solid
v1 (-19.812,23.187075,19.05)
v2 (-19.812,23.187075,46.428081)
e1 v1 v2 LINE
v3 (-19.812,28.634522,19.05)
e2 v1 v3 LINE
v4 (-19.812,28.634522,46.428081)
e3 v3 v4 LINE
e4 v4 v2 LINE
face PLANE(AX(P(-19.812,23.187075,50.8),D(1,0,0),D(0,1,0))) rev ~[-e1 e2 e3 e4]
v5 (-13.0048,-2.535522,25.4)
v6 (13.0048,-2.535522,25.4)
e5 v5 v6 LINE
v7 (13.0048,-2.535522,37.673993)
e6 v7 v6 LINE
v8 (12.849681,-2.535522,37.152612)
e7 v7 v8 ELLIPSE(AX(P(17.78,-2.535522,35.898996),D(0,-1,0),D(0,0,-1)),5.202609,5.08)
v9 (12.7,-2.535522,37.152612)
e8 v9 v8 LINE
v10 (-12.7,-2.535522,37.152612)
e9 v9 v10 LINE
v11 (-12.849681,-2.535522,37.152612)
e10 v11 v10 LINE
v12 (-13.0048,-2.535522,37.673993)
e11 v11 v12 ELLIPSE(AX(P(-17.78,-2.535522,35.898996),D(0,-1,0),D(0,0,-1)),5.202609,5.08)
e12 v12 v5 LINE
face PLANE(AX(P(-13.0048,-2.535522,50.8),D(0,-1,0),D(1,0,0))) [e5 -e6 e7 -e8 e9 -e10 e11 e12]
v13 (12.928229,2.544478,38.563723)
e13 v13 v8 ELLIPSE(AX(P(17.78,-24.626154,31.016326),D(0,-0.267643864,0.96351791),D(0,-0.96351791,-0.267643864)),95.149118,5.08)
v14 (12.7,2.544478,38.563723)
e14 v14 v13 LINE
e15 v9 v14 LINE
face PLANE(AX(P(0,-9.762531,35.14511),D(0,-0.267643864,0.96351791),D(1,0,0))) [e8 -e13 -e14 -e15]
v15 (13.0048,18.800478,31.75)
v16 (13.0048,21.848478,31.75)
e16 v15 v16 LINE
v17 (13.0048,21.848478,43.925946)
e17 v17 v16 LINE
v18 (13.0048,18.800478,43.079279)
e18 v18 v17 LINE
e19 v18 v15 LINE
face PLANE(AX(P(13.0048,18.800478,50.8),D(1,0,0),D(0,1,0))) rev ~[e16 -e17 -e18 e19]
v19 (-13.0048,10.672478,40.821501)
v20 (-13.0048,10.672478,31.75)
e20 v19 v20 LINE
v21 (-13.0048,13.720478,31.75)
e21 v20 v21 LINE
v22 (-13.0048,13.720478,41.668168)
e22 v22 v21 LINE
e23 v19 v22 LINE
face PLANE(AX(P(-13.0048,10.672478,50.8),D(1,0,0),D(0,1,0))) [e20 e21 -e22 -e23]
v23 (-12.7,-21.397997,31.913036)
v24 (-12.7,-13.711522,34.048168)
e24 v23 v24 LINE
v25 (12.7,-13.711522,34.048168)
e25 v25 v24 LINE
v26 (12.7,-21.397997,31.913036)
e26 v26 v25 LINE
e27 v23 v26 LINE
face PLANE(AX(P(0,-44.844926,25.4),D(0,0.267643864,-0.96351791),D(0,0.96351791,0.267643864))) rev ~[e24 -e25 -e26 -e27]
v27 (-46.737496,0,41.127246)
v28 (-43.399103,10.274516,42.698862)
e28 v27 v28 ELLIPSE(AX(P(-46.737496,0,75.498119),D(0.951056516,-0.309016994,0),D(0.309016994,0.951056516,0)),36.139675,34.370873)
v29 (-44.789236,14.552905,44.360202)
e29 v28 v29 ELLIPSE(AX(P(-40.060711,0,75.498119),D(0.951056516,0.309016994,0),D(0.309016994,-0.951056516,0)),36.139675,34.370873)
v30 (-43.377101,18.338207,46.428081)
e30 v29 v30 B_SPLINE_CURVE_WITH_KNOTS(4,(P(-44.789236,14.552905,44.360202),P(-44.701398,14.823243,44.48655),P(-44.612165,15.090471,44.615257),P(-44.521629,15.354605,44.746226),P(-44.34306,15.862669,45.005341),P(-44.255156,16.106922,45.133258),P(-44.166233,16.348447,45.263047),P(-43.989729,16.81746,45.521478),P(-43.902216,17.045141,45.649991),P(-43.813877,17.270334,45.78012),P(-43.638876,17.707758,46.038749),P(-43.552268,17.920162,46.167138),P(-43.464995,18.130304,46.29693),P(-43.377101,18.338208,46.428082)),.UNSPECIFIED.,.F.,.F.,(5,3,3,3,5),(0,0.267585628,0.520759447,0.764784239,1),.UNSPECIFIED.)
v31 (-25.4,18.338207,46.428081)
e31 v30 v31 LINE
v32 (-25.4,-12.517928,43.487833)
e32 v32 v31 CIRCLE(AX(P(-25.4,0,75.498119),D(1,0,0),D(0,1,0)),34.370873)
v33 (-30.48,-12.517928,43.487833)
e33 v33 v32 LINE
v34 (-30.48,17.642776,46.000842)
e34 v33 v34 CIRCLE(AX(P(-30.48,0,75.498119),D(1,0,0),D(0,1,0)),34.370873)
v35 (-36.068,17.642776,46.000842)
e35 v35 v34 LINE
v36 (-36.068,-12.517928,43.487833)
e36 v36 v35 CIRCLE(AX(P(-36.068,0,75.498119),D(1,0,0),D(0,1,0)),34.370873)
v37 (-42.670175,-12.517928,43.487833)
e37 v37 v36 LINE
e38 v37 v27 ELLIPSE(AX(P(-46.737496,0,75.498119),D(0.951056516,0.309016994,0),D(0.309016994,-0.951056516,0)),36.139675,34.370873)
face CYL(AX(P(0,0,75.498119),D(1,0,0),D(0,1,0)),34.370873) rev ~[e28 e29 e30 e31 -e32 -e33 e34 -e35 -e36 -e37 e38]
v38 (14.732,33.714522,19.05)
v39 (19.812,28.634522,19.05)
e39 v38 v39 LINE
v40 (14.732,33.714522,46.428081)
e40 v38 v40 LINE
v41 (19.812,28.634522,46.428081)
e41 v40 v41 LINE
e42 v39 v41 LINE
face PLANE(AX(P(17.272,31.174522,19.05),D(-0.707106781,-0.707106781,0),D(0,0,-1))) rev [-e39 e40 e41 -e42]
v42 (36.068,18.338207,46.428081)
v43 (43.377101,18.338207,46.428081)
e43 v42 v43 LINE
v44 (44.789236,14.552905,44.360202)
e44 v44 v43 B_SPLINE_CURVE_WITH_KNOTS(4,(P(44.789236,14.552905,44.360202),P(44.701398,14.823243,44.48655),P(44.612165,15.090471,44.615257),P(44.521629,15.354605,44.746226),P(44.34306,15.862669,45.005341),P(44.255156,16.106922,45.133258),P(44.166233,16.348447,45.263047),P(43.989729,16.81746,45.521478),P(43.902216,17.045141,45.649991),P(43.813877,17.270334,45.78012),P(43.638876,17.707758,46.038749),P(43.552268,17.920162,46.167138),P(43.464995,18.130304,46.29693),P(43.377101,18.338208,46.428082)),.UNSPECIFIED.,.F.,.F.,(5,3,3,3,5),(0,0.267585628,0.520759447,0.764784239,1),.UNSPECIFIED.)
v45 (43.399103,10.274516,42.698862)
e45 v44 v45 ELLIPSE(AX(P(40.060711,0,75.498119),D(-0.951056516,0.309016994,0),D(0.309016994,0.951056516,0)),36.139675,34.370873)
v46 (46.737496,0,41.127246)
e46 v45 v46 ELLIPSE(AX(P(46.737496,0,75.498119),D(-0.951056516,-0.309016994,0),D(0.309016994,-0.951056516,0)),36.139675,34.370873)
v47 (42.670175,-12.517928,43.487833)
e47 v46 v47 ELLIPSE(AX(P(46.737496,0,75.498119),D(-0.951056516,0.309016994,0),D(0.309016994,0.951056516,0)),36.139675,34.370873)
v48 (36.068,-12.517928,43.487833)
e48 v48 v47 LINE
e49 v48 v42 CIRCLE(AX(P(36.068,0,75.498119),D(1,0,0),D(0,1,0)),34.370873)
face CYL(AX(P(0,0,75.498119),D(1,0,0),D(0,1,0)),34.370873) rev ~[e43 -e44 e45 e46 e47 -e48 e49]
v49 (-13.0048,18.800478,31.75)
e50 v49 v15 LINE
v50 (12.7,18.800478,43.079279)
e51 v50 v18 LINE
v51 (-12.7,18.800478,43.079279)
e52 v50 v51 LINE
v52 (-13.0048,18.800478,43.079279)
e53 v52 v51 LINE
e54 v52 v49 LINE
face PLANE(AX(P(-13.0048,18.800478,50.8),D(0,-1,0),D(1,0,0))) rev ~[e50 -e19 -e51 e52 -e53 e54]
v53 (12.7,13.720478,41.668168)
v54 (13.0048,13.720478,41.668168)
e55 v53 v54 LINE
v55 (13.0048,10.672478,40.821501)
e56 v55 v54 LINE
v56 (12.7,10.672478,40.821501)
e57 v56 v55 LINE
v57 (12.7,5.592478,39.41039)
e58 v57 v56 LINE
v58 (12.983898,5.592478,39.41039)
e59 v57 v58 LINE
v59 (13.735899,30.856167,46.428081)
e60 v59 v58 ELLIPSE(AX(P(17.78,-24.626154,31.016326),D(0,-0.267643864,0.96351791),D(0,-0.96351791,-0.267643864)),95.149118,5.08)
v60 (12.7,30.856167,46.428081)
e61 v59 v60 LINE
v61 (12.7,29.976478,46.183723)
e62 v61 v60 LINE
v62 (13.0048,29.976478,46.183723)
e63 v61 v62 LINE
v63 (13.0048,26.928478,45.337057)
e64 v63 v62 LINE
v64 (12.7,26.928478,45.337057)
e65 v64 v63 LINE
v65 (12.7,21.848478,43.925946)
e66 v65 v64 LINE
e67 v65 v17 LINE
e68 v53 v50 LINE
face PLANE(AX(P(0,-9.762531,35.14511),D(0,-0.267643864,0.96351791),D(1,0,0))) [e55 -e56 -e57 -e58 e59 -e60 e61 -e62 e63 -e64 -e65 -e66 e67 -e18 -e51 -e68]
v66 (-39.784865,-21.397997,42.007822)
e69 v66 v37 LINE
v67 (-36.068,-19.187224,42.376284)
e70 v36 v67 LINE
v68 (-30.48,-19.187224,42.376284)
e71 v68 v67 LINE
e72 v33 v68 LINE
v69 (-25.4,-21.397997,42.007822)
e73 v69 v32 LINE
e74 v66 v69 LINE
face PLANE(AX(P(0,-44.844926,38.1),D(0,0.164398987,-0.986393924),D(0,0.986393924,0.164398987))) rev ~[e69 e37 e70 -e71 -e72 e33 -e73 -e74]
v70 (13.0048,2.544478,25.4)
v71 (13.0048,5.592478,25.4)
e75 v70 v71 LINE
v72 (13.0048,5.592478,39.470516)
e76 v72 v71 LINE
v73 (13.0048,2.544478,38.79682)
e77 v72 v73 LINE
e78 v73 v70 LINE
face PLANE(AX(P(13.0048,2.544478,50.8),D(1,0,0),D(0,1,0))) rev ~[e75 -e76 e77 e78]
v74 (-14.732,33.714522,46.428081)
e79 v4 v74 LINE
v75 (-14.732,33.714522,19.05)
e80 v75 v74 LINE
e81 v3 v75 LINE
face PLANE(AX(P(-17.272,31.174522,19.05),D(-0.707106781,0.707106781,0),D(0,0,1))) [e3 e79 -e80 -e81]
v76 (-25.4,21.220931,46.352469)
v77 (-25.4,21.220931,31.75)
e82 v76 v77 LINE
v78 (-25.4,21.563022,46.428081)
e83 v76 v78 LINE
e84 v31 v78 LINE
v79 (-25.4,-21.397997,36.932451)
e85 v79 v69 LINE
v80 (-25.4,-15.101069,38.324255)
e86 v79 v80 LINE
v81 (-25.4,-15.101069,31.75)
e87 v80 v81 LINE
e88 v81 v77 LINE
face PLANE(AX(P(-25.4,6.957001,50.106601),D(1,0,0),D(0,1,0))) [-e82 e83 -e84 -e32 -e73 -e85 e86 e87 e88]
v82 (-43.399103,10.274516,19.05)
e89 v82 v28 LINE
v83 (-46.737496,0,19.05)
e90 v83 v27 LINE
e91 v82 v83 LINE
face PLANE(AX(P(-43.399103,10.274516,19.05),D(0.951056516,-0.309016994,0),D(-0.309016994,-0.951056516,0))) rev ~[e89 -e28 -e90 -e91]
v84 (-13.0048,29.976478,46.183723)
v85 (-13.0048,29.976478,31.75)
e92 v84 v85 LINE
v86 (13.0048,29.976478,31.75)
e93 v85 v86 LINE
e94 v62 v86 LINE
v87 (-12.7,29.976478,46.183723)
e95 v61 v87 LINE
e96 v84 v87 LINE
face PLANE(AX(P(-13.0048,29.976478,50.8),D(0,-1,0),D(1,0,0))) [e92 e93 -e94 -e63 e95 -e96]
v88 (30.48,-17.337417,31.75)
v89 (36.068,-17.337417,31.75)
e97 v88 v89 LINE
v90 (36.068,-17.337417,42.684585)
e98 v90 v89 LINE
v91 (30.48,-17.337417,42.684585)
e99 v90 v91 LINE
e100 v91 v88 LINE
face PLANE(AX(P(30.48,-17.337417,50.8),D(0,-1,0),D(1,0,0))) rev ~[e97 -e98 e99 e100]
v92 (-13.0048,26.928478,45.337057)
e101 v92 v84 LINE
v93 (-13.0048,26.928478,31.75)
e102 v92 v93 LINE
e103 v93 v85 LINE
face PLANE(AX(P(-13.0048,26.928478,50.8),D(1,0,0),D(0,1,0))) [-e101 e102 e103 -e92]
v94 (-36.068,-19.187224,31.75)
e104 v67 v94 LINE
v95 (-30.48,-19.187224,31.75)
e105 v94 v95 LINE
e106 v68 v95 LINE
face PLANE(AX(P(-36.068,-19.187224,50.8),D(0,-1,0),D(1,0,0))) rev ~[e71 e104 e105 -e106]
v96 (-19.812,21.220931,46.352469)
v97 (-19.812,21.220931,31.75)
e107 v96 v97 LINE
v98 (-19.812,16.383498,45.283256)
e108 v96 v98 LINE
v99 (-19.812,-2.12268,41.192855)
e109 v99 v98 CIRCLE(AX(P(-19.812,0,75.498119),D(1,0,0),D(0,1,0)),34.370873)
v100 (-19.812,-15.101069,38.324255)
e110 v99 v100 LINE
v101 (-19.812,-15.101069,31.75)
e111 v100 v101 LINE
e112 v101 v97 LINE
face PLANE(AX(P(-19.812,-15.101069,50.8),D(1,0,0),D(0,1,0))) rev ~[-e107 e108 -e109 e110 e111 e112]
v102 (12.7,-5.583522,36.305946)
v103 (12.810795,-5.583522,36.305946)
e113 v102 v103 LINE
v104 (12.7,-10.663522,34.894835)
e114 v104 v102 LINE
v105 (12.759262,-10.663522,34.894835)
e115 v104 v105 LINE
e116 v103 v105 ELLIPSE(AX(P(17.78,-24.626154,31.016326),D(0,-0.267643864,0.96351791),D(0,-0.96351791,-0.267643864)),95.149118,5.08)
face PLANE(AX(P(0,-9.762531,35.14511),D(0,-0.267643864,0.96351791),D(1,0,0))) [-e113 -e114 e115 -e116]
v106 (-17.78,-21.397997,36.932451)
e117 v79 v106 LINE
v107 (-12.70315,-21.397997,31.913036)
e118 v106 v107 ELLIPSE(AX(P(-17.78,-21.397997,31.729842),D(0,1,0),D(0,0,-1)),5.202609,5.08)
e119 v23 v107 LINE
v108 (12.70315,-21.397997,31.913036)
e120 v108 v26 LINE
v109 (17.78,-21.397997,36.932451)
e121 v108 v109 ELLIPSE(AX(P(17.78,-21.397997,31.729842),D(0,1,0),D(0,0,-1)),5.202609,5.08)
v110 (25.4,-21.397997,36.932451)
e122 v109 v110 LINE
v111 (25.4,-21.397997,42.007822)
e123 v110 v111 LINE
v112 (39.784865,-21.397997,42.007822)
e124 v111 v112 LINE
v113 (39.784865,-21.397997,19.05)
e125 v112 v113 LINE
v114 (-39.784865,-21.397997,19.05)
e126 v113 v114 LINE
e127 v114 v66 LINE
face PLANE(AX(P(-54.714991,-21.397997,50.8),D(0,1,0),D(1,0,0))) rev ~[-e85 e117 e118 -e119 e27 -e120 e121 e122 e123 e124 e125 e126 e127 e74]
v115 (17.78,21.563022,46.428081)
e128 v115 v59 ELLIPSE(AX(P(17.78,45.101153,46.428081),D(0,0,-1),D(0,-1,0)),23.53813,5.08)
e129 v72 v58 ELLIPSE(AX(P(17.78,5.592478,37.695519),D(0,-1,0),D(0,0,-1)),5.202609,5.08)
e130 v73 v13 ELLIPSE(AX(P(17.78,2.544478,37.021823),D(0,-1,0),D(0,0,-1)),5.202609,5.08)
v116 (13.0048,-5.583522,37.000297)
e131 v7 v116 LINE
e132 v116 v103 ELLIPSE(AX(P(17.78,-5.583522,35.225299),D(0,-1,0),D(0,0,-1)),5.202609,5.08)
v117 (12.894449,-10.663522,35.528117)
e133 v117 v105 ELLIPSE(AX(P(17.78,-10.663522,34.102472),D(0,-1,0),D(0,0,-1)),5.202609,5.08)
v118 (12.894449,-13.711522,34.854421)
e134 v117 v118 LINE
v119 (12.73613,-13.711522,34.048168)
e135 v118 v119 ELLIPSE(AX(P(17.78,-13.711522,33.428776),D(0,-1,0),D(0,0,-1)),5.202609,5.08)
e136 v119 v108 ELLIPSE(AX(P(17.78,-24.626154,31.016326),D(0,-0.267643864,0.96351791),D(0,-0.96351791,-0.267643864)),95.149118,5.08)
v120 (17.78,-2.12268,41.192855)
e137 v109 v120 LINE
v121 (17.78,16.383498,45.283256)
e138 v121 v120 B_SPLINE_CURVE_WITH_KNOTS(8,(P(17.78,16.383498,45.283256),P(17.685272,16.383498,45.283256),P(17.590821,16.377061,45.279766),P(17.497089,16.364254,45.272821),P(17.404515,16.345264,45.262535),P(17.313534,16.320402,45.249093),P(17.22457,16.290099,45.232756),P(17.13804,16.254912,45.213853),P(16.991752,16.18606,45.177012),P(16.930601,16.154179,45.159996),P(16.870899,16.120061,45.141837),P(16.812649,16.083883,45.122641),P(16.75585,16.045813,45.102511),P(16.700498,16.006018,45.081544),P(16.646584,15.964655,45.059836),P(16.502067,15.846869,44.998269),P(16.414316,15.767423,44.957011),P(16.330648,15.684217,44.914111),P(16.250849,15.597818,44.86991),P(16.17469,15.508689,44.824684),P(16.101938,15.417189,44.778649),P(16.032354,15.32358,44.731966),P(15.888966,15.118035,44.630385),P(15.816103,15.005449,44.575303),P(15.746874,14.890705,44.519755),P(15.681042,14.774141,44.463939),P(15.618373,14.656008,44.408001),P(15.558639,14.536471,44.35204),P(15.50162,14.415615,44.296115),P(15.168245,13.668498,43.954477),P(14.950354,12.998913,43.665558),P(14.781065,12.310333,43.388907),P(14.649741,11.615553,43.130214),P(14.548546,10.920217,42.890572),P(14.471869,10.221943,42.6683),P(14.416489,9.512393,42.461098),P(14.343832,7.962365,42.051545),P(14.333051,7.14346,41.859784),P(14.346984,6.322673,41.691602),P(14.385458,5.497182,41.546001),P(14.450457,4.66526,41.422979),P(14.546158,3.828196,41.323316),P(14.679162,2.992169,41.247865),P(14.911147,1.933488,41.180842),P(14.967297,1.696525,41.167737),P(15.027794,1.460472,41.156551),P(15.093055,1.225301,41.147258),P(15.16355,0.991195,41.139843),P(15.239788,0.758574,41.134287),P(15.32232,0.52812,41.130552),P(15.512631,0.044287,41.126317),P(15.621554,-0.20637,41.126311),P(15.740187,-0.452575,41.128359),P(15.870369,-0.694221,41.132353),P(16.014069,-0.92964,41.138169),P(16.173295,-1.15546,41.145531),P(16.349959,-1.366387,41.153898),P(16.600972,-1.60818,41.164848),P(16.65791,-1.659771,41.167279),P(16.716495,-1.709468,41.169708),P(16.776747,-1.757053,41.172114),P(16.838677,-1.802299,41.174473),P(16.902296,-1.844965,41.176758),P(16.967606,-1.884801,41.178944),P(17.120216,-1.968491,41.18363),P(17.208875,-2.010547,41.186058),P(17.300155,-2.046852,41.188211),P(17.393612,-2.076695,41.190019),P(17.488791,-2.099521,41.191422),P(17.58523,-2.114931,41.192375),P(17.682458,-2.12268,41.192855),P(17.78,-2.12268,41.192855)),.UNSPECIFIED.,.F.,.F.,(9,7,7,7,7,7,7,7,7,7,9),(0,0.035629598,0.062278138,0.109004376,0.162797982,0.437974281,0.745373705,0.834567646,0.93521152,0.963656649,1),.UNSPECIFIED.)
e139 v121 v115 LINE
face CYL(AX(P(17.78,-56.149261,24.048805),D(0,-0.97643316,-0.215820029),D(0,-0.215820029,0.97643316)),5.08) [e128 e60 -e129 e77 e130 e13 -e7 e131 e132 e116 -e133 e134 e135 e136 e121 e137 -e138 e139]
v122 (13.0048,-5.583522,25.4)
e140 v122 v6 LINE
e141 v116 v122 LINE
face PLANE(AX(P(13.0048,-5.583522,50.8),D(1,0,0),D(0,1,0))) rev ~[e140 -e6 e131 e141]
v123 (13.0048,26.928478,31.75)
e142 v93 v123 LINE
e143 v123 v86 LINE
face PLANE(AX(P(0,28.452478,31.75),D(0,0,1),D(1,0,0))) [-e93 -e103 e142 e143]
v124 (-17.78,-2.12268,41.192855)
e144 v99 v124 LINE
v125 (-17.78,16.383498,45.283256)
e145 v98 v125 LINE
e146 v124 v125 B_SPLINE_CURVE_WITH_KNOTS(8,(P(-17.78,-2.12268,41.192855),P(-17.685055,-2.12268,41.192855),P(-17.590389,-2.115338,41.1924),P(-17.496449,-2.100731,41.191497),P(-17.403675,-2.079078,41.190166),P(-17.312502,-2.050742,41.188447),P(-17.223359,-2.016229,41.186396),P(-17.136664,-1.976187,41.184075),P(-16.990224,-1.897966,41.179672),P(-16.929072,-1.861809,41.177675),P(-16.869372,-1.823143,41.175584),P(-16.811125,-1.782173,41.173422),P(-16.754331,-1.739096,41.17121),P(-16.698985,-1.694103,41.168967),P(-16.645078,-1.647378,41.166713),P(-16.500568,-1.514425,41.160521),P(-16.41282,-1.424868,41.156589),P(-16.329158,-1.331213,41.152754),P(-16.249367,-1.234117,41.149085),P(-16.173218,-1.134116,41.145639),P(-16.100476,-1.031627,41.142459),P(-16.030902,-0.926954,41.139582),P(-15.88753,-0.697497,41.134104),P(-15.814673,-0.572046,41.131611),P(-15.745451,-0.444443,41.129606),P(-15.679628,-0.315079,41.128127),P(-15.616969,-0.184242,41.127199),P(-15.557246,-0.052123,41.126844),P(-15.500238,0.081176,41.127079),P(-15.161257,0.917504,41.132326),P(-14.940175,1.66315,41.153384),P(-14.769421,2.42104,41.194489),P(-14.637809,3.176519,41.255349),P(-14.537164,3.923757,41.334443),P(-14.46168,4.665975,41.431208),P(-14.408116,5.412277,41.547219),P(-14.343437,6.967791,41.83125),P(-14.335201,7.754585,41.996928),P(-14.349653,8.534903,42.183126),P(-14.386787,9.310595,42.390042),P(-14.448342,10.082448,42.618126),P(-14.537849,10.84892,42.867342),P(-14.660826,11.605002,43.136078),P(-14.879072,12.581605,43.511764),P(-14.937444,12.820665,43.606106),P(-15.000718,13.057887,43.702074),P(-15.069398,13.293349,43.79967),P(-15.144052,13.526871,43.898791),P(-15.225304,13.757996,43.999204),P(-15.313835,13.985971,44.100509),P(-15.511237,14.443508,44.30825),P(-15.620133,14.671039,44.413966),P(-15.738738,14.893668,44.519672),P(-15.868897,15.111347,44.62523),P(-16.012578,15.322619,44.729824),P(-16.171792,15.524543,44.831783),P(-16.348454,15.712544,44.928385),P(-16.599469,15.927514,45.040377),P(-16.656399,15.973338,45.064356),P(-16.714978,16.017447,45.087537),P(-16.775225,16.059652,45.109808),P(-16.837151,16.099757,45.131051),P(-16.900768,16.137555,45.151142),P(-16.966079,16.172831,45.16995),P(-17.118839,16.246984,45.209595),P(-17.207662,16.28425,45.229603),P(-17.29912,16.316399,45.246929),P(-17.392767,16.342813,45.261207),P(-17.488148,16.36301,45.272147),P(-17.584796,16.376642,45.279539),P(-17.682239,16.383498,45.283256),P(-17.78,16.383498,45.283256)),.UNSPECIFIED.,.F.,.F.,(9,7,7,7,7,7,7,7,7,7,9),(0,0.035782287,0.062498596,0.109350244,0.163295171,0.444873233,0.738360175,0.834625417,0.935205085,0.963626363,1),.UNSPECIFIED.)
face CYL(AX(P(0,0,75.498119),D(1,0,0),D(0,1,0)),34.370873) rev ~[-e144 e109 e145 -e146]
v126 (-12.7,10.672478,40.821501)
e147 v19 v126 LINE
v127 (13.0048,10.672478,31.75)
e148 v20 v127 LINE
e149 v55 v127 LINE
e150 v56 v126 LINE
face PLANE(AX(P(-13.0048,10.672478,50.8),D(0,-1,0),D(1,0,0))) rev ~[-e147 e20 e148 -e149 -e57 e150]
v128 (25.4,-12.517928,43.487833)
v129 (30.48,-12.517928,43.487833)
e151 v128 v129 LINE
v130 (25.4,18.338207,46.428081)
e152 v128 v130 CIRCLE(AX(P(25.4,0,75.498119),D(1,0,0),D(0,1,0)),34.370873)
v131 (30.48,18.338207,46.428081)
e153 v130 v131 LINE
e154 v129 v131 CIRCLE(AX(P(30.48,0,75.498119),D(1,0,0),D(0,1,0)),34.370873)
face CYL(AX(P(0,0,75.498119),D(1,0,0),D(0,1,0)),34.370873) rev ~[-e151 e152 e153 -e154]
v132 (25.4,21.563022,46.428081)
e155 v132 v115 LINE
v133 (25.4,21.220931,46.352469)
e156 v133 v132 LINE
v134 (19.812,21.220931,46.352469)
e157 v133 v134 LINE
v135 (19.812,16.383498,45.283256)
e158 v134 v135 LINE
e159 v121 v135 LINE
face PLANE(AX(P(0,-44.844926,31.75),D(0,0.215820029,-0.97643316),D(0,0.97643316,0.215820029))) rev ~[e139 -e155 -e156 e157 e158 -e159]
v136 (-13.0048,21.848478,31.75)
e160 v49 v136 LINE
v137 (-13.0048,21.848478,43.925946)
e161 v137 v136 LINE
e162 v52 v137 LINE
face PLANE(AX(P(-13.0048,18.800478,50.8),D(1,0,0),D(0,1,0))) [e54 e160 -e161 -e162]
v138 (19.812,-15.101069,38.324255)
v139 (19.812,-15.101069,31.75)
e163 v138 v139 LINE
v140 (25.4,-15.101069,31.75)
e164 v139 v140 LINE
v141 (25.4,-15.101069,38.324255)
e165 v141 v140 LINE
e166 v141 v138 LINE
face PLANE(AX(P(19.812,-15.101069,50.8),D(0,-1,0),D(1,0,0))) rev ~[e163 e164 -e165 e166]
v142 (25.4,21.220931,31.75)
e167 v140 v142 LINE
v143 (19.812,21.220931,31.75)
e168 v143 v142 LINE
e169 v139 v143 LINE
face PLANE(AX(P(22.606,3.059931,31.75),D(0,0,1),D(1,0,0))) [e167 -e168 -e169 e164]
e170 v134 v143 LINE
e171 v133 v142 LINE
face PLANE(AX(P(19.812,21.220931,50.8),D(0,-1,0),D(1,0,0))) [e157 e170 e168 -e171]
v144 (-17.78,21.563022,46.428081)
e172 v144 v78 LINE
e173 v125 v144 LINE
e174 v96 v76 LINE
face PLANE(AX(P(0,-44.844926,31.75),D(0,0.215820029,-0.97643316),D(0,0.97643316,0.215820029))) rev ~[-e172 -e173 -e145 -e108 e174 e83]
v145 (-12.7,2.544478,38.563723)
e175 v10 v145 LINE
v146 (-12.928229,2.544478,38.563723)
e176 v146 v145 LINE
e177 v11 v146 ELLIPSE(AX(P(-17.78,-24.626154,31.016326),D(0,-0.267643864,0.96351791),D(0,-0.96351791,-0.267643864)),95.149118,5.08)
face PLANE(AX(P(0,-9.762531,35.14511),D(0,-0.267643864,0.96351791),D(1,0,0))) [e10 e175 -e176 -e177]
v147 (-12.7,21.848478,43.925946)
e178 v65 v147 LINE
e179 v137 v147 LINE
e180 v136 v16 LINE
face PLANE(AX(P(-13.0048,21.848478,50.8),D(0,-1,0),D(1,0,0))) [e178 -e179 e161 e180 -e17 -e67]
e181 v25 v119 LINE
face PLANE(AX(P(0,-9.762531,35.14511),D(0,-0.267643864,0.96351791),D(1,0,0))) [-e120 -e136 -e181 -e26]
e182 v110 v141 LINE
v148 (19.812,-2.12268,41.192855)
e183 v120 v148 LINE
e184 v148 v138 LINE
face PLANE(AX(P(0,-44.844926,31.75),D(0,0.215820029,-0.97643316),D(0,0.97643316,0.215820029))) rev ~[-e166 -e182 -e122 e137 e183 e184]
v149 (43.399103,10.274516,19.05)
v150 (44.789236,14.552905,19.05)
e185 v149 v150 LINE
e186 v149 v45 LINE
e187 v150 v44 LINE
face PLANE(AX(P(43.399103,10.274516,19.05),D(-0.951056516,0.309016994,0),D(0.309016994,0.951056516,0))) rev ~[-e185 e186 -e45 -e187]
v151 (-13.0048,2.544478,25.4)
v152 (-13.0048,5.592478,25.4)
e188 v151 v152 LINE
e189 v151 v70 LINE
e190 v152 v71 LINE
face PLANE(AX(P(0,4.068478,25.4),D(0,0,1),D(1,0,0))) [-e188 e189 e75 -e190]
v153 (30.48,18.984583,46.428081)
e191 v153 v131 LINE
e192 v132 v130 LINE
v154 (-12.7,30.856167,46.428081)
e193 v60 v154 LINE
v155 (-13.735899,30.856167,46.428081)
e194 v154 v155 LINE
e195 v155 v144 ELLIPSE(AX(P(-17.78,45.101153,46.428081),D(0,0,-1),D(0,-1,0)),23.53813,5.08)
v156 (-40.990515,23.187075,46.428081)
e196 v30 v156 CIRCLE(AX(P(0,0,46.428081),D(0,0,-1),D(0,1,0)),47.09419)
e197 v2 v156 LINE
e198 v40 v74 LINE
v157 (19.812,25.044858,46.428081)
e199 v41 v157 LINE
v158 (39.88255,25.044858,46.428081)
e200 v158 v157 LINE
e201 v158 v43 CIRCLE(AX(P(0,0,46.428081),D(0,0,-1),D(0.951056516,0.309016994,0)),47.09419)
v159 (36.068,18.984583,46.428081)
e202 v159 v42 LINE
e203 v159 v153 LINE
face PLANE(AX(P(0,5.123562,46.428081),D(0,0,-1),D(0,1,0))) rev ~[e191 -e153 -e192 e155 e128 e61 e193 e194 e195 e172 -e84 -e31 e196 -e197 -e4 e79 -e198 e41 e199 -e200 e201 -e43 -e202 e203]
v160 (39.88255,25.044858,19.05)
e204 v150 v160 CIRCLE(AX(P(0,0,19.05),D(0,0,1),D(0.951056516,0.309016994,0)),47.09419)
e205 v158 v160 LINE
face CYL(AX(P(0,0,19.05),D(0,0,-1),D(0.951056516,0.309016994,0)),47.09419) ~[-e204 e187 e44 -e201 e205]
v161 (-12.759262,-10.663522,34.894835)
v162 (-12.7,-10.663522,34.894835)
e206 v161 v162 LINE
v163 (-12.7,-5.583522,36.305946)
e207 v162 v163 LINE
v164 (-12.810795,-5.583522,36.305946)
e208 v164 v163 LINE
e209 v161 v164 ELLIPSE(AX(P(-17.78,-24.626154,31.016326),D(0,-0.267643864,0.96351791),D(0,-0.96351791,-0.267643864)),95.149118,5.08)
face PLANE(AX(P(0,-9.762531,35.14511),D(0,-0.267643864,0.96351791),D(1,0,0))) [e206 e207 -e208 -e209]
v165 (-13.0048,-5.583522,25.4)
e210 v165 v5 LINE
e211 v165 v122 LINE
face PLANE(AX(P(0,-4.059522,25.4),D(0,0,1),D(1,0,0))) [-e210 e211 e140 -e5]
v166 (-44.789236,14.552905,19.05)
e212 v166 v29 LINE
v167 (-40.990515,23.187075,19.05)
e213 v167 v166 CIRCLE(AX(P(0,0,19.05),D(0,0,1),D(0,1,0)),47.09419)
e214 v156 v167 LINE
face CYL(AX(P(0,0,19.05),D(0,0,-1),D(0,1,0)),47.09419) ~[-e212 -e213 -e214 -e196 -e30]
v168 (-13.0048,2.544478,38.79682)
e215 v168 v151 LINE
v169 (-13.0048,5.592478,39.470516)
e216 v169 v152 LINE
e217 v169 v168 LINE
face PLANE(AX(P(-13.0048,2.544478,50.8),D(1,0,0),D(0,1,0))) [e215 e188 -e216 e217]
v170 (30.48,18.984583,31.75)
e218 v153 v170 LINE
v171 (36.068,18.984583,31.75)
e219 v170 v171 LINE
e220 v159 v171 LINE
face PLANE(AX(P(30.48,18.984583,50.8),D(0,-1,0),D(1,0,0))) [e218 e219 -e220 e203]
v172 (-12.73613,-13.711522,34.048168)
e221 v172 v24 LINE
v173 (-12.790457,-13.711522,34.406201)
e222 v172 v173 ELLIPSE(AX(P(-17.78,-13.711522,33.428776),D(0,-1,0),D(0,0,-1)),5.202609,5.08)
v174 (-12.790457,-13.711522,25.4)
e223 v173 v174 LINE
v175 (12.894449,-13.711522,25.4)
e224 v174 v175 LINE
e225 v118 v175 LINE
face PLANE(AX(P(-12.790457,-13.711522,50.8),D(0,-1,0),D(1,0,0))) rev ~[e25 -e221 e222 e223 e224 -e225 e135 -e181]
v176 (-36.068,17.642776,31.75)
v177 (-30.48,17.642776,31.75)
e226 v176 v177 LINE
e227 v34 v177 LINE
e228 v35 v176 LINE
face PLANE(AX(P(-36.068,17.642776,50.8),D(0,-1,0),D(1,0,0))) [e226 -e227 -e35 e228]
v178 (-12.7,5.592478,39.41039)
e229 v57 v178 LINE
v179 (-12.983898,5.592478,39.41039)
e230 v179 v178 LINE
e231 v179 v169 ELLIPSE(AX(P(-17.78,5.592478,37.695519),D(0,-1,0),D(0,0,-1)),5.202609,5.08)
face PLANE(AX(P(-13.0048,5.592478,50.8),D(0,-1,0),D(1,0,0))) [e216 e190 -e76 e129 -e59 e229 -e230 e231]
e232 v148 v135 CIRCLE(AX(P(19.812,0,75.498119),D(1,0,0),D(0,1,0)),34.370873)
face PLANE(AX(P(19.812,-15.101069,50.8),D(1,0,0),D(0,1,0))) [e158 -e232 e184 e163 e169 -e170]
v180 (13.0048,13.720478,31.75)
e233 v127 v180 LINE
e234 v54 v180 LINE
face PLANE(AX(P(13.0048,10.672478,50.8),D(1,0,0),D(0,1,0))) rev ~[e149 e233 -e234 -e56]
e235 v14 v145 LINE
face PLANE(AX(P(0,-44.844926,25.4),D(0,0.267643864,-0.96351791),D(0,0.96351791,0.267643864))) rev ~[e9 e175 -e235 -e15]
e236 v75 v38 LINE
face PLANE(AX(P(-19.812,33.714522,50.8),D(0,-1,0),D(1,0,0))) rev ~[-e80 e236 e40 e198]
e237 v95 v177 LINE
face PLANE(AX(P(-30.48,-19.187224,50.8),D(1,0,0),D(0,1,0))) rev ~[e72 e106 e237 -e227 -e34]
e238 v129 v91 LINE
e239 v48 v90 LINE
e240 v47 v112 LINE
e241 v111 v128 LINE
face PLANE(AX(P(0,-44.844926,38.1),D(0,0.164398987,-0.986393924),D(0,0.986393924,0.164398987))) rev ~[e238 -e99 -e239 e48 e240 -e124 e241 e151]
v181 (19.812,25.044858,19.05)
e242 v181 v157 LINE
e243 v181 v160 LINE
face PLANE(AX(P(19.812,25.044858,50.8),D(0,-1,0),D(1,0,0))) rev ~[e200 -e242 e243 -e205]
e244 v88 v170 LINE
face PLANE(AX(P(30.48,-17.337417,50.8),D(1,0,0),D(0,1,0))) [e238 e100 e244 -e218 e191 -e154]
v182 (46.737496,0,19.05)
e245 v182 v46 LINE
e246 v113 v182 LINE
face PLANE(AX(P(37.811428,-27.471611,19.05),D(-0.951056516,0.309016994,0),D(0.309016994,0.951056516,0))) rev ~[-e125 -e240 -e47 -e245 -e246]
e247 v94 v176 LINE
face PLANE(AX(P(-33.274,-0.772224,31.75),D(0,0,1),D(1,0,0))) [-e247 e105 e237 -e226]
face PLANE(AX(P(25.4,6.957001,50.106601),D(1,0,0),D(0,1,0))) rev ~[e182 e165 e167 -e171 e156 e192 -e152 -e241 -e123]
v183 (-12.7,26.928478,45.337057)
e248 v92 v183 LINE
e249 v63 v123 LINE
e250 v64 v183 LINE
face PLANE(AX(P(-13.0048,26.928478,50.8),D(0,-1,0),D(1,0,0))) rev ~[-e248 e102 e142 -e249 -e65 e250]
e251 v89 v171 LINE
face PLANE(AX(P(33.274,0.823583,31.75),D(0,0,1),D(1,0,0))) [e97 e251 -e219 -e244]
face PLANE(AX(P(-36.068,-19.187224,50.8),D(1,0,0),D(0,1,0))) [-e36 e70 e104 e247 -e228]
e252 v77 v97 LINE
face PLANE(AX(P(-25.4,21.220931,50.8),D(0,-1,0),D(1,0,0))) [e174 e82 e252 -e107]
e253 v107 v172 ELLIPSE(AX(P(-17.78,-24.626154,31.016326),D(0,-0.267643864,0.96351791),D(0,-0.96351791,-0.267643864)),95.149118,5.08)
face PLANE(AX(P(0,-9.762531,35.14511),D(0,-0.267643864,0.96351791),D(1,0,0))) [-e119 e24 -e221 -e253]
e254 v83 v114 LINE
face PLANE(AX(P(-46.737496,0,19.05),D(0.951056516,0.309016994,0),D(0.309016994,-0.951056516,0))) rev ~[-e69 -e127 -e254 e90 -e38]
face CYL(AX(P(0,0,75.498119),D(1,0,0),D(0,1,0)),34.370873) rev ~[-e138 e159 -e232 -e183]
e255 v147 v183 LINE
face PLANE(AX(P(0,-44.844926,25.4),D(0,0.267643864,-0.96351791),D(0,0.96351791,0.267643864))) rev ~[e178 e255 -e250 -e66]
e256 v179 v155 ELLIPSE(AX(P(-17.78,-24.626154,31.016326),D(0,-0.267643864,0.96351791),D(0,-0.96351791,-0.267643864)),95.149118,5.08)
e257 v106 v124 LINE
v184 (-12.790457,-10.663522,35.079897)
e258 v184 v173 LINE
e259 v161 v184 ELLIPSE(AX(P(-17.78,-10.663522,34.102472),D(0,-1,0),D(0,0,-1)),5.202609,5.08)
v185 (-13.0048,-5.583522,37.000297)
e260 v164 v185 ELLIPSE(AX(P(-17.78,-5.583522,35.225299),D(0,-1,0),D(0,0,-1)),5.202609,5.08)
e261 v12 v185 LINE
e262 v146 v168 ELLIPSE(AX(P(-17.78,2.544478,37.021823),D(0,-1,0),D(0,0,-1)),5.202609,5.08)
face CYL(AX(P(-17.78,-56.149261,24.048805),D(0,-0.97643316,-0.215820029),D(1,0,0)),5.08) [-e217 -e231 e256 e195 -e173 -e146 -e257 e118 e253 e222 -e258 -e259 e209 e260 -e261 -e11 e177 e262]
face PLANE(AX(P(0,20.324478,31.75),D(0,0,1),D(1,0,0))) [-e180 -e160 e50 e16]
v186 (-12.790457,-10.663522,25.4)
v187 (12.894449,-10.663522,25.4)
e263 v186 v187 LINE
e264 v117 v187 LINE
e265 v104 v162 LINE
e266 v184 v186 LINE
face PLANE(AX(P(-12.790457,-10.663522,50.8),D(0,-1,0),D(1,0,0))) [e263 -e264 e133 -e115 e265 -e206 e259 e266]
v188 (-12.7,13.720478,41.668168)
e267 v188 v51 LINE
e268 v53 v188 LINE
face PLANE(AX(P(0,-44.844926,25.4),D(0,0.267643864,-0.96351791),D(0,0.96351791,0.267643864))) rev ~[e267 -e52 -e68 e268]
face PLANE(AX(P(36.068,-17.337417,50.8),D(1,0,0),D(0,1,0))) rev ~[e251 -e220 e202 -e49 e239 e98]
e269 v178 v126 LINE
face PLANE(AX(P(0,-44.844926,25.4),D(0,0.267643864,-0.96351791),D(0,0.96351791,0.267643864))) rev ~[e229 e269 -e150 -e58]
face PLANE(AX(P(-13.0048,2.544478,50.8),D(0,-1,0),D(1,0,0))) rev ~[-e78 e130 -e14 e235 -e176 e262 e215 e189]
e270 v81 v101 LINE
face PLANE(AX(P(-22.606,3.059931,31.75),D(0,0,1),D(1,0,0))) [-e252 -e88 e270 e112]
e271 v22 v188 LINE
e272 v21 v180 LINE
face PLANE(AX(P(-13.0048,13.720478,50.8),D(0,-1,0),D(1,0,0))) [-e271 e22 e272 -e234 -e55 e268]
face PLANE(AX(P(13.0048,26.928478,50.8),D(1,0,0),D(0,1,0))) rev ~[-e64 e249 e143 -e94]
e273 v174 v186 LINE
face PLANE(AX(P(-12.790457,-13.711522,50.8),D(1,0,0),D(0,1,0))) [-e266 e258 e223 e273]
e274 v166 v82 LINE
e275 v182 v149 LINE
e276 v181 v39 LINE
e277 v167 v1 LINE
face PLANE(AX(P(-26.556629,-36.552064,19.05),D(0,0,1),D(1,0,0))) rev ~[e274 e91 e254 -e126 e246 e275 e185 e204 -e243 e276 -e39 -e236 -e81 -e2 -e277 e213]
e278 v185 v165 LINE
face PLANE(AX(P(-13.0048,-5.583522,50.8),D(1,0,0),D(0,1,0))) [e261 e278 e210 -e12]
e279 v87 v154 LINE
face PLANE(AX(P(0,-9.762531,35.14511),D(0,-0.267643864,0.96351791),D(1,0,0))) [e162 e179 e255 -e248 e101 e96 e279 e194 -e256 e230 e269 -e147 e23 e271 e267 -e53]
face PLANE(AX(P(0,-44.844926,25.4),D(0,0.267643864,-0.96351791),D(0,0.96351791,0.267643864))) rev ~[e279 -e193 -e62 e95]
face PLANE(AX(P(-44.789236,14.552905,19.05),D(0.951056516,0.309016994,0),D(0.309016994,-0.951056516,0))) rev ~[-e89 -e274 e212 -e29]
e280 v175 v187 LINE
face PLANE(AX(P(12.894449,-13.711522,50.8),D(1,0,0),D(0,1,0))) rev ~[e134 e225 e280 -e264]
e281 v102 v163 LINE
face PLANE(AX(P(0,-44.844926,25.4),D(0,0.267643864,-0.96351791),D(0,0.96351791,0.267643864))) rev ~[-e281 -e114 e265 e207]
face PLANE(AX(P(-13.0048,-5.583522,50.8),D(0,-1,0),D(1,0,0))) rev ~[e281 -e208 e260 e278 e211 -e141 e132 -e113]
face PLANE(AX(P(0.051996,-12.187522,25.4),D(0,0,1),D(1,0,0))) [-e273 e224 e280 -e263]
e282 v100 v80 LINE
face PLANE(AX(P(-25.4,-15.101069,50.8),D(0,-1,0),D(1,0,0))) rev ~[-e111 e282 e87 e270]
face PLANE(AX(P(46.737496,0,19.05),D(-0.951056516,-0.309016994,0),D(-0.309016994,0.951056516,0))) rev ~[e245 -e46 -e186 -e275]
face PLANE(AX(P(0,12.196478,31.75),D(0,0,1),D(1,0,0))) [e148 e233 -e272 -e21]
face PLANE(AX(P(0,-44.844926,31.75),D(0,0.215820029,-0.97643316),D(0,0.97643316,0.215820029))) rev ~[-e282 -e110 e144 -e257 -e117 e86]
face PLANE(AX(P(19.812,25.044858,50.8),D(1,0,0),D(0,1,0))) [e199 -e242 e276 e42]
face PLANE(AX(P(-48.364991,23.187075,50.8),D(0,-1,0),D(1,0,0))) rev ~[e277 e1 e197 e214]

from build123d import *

# Parameters (mm, degrees)
F1_START       = 19.05
F1_DEPTH       = 31.75
F3_DEPTH       = 12.7
F5_DEPTH       = 25.4
F7_DEPTH       = 50.8
F10_T4_DEPTH   = 118.8107467306
F10_T9_DEPTH   = 118.8107467306
F11_W          = 5.588
F11_H          = 36.83
F11_H_2        = 36.322
F12_DEPTH      = 25.4
F12_DEPTH_BACK = 19.05
F13_W          = 26.0096
F13_H          = 3.048
F14_DEPTH      = 19.05
F15_W          = 26.0096
F15_H          = 3.048
F15_W_2        = 25.684906454
F16_DEPTH      = 25.4
F17_R          = 34.3708732133
F18_DEPTH      = 63.5
F19_W          = 101.6
F19_H          = 32.0445634425
F19_W_2        = 28.5529913381
F19_H_2        = 6.6054575145
F19_H_3        = 10.527446866
F19_W_3        = 20.7230086619
F19_H_4        = 8.6696632206
F19_H_5        = 7.8439861536
F20_DEPTH      = 38.1
F21_SIZE       = 5.08


# Not quite as in the source:
# - a fillet or chamfer that OpenCascade refuses, or shapes differently, is made with other operations: its cross-section is extruded or revolved along the edge and cut away or added
# - a feature of the source that left no trace in its solid (it failed there, or was rolled back) is left out


with BuildPart() as f1:
    # F0 (on Top) → F1 (new body)
    with BuildSketch(Plane.XY.offset(F1_START)):
        Polygon((-27.681270317, -38.1), (-23.1827056925, -38.1), (-29.0714032363, -33.8216107999), align=None)
        Polygon((-29.0714032363, -33.8216107999), (-23.1827056925, -38.1), (23.1827056925, -38.1), (29.0714032363, -33.8216107999), (43.3991033054, 10.2745158286), (41.1498209932, 17.1970949714), (3.6394152315, 44.45), (-3.6394152315, 44.45), (-41.1498209932, 17.1970949714), (-43.3991033054, 10.2745158286), align=None)
        with BuildLine():
            Line((23.1827056925, -38.1), (-23.1827056925, -38.1))
            Line((-23.1827056925, -38.1), (-27.681270317, -38.1))
            ThreePointArc((-27.681270317, -38.1), (0, -47.0941899427), (27.681270317, -38.1))
            Line((27.681270317, -38.1), (23.1827056925, -38.1))
        make_face()
        Polygon((-37.8114284312, -27.4716107999), (-29.0714032363, -33.8216107999), (-43.3991033054, 10.2745158286), (-46.7374958674, 0), align=None)
        Polygon((29.0714032363, -33.8216107999), (23.1827056925, -38.1), (27.681270317, -38.1), align=None)
        Polygon((-44.7892362247, 14.5529050286), (-43.3991033054, 10.2745158286), (-41.1498209932, 17.1970949714), align=None)
        Polygon((43.3991033054, 10.2745158286), (29.0714032363, -33.8216107999), (37.8114284312, -27.4716107999), (46.7374958674, 0), align=None)
        with BuildLine():
            Line((-44.7892362247, 14.5529050286), (-41.1498209932, 17.1970949714))
            Line((-41.1498209932, 17.1970949714), (-3.6394152315, 44.45))
            Line((-3.6394152315, 44.45), (0, 47.0941899427))
            ThreePointArc((0, 47.0941899427), (-27.681270317, 38.1), (-44.7892362247, 14.5529050286))
        make_face()
        Polygon((41.1498209932, 17.1970949714), (43.3991033054, 10.2745158286), (44.7892362247, 14.5529050286), align=None)
        Polygon((0, 47.0941899427), (-3.6394152315, 44.45), (3.6394152315, 44.45), align=None)
        with BuildLine():
            ThreePointArc((44.7892362247, 14.5529050286), (27.681270317, 38.1), (0, 47.0941899427))
            Line((0, 47.0941899427), (3.6394152315, 44.45))
            Line((3.6394152315, 44.45), (41.1498209932, 17.1970949714))
            Line((41.1498209932, 17.1970949714), (44.7892362247, 14.5529050286))
        make_face()
    extrude(amount=F1_DEPTH)

    # F2 (on Right) → F3 (cut, symmetric)
    with BuildSketch(Plane.YZ):
        Polygon((-44.8449260175, 25.4), (69.4550739825, 57.15), (-44.8449260175, 57.15), align=None)
    extrude(amount=F3_DEPTH, both=True, mode=Mode.SUBTRACT)

    # F4 (on Right) → F5 (cut, symmetric)
    with BuildSketch(Plane.YZ):
        Polygon((-44.8449260175, 31.75), (70.0721293688, 57.15), (-44.8449260175, 57.15), align=None)
    extrude(amount=F5_DEPTH, both=True, mode=Mode.SUBTRACT)

    # F6 (on Right) → F7 (cut, symmetric)
    with BuildSketch(Plane.YZ):
        Polygon((69.4550739825, 57.15), (-44.8449260175, 57.15), (-44.8449260175, 38.1), (5.1235620631, 46.4280813468), (48.464309937, 53.6515393258), align=None)
        Polygon((48.464309937, 46.4280813468), (48.464309937, 53.6515393258), (5.1235620631, 46.4280813468), align=None)
    extrude(amount=F7_DEPTH, both=True, mode=Mode.SUBTRACT)

    # F10: fillet of radius 5.08 on 2 edges, made by hand


with BuildPart() as f10_tool2:
    # F10_s3 → F10_t4 (new body)
    with BuildSketch(Plane(origin=(0, -48.4660281995, -10.712396973), x_dir=(1, 0, 0), z_dir=(0, 0.9764331595, 0.2158200292))):
        with BuildLine():
            ThreePointArc((-12.7, -35.6001860579), (-14.1878975516, -39.1922885063), (-17.78, -40.6801860579))
            Line((-17.78, -40.6801860579), (-12.7, -40.6801860579))
            Line((-12.7, -40.6801860579), (-12.7, -35.6001860579))
        make_face()
    extrude(amount=F10_T4_DEPTH)

    split(bisect_by=Plane(origin=(0, -9.762530517, 35.1451098613), x_dir=(1, 0, 0), z_dir=(0, -0.2676438638, 0.9635179096)), keep=Keep.TOP)


with BuildPart() as f1_1:
    add(f1.part)

    # F10_t1: cut F10_tool2
    add(f10_tool2.part, mode=Mode.SUBTRACT)


with BuildPart() as f10_tool7:
    # F10_s8 → F10_t9 (new body)
    with BuildSketch(Plane(origin=(0, -48.4660281995, -10.712396973), x_dir=(1, 0, 0), z_dir=(0, 0.9764331595, 0.2158200292))):
        with BuildLine():
            ThreePointArc((17.78, -40.6801860579), (14.1878975516, -39.1922885063), (12.7, -35.6001860579))
            Line((12.7, -35.6001860579), (12.7, -40.6801860579))
            Line((12.7, -40.6801860579), (17.78, -40.6801860579))
        make_face()
    extrude(amount=F10_T9_DEPTH)

    split(bisect_by=Plane(origin=(0, -9.762530517, 35.1451098613), x_dir=(1, 0, 0), z_dir=(0, -0.2676438638, 0.9635179096)), keep=Keep.TOP)


with BuildPart() as f1_2:
    add(f1_1.part)

    # F10_t6: cut F10_tool7
    add(f10_tool7.part, mode=Mode.SUBTRACT)

    # F11 (on offset) → F12 (cut, two sides)
    with BuildSketch(Plane.XY.offset(50.8)) as f12_sk:
        with Locations((-33.274, -0.7722239547)):
            Rectangle(F11_W, F11_H)
        with Locations((-22.606, 3.0599313468)):
            Rectangle(F11_W, F11_H_2)
        with Locations((33.274, 0.82358277)):
            Rectangle(F11_W, F11_H_2)
        with Locations((22.606, 3.0599313468)):
            Rectangle(F11_W, F11_H_2)
    extrude(amount=F12_DEPTH, mode=Mode.SUBTRACT)
    extrude(f12_sk.sketch, amount=-F12_DEPTH_BACK, mode=Mode.SUBTRACT)

    # F13 (on offset) → F14 (cut)
    with BuildSketch(Plane.XY.offset(50.8)):
        with Locations((0, 12.1964783492)):
            Rectangle(F13_W, F13_H)
        with Locations((0, 28.4524783492)):
            Rectangle(F13_W, F13_H)
        with Locations((0, 20.3244783492)):
            Rectangle(F13_W, F13_H)
    extrude(amount=-F14_DEPTH, mode=Mode.SUBTRACT)

    # F15 (on offset) → F16 (cut)
    with BuildSketch(Plane.XY.offset(50.8)):
        with Locations((0, -4.0595216508)):
            Rectangle(F15_W, F15_H)
        with Locations((0.0519962238, -12.1875216508)):
            Rectangle(F15_W_2, F15_H)
        with Locations((0, 4.0684783492)):
            Rectangle(F15_W, F15_H)
    extrude(amount=-F16_DEPTH, mode=Mode.SUBTRACT)

    # F17 (on Right) → F18 (cut, symmetric)
    with BuildSketch(Plane.YZ):
        with Locations((0, 75.4981189966)):
            Circle(F17_R)
    extrude(amount=F18_DEPTH, both=True, mode=Mode.SUBTRACT)

    # F19 (on offset) → F20 (cut, symmetric)
    with BuildSketch(Plane.XY.offset(50.8)):
        with Locations((-3.9149913381, -37.4202784151)):
            Rectangle(F19_W, F19_H)
        Polygon((46.8850086619, 51.8795326352), (-54.7149913381, 51.8795326352), (-54.7149913381, 33.7145216763), (-48.3649913381, 33.7145216763), (-48.3649913381, 40.3199791908), (-19.812, 40.3199791908), (-19.812, 33.7145216763), (19.812, 33.7145216763), (19.812, 41.5585078299), (40.5350086619, 41.5585078299), (40.5350086619, 33.7145216763), (46.8850086619, 33.7145216763), align=None)
        with Locations((-34.088495669, 37.0172504336)):
            Rectangle(F19_W_2, F19_H_2)
        with Locations((-34.088495669, 28.4507982433)):
            Rectangle(F19_W_2, F19_H_3)
        with Locations((30.173504331, 29.379690066)):
            Rectangle(F19_W_3, F19_H_4)
        with Locations((30.173504331, 37.6365147531)):
            Rectangle(F19_W_3, F19_H_5)
    extrude(amount=F20_DEPTH, both=True, mode=Mode.SUBTRACT)

    # F21
    f21_edges = [f1_2.edges().sort_by_distance(p)[0] for p in [
        (-19.812, 33.714522, 32.739041),
        (19.812, 33.714522, 32.739041),
    ]]
    chamfer(f21_edges, length=F21_SIZE)


solid = f1_2.part
